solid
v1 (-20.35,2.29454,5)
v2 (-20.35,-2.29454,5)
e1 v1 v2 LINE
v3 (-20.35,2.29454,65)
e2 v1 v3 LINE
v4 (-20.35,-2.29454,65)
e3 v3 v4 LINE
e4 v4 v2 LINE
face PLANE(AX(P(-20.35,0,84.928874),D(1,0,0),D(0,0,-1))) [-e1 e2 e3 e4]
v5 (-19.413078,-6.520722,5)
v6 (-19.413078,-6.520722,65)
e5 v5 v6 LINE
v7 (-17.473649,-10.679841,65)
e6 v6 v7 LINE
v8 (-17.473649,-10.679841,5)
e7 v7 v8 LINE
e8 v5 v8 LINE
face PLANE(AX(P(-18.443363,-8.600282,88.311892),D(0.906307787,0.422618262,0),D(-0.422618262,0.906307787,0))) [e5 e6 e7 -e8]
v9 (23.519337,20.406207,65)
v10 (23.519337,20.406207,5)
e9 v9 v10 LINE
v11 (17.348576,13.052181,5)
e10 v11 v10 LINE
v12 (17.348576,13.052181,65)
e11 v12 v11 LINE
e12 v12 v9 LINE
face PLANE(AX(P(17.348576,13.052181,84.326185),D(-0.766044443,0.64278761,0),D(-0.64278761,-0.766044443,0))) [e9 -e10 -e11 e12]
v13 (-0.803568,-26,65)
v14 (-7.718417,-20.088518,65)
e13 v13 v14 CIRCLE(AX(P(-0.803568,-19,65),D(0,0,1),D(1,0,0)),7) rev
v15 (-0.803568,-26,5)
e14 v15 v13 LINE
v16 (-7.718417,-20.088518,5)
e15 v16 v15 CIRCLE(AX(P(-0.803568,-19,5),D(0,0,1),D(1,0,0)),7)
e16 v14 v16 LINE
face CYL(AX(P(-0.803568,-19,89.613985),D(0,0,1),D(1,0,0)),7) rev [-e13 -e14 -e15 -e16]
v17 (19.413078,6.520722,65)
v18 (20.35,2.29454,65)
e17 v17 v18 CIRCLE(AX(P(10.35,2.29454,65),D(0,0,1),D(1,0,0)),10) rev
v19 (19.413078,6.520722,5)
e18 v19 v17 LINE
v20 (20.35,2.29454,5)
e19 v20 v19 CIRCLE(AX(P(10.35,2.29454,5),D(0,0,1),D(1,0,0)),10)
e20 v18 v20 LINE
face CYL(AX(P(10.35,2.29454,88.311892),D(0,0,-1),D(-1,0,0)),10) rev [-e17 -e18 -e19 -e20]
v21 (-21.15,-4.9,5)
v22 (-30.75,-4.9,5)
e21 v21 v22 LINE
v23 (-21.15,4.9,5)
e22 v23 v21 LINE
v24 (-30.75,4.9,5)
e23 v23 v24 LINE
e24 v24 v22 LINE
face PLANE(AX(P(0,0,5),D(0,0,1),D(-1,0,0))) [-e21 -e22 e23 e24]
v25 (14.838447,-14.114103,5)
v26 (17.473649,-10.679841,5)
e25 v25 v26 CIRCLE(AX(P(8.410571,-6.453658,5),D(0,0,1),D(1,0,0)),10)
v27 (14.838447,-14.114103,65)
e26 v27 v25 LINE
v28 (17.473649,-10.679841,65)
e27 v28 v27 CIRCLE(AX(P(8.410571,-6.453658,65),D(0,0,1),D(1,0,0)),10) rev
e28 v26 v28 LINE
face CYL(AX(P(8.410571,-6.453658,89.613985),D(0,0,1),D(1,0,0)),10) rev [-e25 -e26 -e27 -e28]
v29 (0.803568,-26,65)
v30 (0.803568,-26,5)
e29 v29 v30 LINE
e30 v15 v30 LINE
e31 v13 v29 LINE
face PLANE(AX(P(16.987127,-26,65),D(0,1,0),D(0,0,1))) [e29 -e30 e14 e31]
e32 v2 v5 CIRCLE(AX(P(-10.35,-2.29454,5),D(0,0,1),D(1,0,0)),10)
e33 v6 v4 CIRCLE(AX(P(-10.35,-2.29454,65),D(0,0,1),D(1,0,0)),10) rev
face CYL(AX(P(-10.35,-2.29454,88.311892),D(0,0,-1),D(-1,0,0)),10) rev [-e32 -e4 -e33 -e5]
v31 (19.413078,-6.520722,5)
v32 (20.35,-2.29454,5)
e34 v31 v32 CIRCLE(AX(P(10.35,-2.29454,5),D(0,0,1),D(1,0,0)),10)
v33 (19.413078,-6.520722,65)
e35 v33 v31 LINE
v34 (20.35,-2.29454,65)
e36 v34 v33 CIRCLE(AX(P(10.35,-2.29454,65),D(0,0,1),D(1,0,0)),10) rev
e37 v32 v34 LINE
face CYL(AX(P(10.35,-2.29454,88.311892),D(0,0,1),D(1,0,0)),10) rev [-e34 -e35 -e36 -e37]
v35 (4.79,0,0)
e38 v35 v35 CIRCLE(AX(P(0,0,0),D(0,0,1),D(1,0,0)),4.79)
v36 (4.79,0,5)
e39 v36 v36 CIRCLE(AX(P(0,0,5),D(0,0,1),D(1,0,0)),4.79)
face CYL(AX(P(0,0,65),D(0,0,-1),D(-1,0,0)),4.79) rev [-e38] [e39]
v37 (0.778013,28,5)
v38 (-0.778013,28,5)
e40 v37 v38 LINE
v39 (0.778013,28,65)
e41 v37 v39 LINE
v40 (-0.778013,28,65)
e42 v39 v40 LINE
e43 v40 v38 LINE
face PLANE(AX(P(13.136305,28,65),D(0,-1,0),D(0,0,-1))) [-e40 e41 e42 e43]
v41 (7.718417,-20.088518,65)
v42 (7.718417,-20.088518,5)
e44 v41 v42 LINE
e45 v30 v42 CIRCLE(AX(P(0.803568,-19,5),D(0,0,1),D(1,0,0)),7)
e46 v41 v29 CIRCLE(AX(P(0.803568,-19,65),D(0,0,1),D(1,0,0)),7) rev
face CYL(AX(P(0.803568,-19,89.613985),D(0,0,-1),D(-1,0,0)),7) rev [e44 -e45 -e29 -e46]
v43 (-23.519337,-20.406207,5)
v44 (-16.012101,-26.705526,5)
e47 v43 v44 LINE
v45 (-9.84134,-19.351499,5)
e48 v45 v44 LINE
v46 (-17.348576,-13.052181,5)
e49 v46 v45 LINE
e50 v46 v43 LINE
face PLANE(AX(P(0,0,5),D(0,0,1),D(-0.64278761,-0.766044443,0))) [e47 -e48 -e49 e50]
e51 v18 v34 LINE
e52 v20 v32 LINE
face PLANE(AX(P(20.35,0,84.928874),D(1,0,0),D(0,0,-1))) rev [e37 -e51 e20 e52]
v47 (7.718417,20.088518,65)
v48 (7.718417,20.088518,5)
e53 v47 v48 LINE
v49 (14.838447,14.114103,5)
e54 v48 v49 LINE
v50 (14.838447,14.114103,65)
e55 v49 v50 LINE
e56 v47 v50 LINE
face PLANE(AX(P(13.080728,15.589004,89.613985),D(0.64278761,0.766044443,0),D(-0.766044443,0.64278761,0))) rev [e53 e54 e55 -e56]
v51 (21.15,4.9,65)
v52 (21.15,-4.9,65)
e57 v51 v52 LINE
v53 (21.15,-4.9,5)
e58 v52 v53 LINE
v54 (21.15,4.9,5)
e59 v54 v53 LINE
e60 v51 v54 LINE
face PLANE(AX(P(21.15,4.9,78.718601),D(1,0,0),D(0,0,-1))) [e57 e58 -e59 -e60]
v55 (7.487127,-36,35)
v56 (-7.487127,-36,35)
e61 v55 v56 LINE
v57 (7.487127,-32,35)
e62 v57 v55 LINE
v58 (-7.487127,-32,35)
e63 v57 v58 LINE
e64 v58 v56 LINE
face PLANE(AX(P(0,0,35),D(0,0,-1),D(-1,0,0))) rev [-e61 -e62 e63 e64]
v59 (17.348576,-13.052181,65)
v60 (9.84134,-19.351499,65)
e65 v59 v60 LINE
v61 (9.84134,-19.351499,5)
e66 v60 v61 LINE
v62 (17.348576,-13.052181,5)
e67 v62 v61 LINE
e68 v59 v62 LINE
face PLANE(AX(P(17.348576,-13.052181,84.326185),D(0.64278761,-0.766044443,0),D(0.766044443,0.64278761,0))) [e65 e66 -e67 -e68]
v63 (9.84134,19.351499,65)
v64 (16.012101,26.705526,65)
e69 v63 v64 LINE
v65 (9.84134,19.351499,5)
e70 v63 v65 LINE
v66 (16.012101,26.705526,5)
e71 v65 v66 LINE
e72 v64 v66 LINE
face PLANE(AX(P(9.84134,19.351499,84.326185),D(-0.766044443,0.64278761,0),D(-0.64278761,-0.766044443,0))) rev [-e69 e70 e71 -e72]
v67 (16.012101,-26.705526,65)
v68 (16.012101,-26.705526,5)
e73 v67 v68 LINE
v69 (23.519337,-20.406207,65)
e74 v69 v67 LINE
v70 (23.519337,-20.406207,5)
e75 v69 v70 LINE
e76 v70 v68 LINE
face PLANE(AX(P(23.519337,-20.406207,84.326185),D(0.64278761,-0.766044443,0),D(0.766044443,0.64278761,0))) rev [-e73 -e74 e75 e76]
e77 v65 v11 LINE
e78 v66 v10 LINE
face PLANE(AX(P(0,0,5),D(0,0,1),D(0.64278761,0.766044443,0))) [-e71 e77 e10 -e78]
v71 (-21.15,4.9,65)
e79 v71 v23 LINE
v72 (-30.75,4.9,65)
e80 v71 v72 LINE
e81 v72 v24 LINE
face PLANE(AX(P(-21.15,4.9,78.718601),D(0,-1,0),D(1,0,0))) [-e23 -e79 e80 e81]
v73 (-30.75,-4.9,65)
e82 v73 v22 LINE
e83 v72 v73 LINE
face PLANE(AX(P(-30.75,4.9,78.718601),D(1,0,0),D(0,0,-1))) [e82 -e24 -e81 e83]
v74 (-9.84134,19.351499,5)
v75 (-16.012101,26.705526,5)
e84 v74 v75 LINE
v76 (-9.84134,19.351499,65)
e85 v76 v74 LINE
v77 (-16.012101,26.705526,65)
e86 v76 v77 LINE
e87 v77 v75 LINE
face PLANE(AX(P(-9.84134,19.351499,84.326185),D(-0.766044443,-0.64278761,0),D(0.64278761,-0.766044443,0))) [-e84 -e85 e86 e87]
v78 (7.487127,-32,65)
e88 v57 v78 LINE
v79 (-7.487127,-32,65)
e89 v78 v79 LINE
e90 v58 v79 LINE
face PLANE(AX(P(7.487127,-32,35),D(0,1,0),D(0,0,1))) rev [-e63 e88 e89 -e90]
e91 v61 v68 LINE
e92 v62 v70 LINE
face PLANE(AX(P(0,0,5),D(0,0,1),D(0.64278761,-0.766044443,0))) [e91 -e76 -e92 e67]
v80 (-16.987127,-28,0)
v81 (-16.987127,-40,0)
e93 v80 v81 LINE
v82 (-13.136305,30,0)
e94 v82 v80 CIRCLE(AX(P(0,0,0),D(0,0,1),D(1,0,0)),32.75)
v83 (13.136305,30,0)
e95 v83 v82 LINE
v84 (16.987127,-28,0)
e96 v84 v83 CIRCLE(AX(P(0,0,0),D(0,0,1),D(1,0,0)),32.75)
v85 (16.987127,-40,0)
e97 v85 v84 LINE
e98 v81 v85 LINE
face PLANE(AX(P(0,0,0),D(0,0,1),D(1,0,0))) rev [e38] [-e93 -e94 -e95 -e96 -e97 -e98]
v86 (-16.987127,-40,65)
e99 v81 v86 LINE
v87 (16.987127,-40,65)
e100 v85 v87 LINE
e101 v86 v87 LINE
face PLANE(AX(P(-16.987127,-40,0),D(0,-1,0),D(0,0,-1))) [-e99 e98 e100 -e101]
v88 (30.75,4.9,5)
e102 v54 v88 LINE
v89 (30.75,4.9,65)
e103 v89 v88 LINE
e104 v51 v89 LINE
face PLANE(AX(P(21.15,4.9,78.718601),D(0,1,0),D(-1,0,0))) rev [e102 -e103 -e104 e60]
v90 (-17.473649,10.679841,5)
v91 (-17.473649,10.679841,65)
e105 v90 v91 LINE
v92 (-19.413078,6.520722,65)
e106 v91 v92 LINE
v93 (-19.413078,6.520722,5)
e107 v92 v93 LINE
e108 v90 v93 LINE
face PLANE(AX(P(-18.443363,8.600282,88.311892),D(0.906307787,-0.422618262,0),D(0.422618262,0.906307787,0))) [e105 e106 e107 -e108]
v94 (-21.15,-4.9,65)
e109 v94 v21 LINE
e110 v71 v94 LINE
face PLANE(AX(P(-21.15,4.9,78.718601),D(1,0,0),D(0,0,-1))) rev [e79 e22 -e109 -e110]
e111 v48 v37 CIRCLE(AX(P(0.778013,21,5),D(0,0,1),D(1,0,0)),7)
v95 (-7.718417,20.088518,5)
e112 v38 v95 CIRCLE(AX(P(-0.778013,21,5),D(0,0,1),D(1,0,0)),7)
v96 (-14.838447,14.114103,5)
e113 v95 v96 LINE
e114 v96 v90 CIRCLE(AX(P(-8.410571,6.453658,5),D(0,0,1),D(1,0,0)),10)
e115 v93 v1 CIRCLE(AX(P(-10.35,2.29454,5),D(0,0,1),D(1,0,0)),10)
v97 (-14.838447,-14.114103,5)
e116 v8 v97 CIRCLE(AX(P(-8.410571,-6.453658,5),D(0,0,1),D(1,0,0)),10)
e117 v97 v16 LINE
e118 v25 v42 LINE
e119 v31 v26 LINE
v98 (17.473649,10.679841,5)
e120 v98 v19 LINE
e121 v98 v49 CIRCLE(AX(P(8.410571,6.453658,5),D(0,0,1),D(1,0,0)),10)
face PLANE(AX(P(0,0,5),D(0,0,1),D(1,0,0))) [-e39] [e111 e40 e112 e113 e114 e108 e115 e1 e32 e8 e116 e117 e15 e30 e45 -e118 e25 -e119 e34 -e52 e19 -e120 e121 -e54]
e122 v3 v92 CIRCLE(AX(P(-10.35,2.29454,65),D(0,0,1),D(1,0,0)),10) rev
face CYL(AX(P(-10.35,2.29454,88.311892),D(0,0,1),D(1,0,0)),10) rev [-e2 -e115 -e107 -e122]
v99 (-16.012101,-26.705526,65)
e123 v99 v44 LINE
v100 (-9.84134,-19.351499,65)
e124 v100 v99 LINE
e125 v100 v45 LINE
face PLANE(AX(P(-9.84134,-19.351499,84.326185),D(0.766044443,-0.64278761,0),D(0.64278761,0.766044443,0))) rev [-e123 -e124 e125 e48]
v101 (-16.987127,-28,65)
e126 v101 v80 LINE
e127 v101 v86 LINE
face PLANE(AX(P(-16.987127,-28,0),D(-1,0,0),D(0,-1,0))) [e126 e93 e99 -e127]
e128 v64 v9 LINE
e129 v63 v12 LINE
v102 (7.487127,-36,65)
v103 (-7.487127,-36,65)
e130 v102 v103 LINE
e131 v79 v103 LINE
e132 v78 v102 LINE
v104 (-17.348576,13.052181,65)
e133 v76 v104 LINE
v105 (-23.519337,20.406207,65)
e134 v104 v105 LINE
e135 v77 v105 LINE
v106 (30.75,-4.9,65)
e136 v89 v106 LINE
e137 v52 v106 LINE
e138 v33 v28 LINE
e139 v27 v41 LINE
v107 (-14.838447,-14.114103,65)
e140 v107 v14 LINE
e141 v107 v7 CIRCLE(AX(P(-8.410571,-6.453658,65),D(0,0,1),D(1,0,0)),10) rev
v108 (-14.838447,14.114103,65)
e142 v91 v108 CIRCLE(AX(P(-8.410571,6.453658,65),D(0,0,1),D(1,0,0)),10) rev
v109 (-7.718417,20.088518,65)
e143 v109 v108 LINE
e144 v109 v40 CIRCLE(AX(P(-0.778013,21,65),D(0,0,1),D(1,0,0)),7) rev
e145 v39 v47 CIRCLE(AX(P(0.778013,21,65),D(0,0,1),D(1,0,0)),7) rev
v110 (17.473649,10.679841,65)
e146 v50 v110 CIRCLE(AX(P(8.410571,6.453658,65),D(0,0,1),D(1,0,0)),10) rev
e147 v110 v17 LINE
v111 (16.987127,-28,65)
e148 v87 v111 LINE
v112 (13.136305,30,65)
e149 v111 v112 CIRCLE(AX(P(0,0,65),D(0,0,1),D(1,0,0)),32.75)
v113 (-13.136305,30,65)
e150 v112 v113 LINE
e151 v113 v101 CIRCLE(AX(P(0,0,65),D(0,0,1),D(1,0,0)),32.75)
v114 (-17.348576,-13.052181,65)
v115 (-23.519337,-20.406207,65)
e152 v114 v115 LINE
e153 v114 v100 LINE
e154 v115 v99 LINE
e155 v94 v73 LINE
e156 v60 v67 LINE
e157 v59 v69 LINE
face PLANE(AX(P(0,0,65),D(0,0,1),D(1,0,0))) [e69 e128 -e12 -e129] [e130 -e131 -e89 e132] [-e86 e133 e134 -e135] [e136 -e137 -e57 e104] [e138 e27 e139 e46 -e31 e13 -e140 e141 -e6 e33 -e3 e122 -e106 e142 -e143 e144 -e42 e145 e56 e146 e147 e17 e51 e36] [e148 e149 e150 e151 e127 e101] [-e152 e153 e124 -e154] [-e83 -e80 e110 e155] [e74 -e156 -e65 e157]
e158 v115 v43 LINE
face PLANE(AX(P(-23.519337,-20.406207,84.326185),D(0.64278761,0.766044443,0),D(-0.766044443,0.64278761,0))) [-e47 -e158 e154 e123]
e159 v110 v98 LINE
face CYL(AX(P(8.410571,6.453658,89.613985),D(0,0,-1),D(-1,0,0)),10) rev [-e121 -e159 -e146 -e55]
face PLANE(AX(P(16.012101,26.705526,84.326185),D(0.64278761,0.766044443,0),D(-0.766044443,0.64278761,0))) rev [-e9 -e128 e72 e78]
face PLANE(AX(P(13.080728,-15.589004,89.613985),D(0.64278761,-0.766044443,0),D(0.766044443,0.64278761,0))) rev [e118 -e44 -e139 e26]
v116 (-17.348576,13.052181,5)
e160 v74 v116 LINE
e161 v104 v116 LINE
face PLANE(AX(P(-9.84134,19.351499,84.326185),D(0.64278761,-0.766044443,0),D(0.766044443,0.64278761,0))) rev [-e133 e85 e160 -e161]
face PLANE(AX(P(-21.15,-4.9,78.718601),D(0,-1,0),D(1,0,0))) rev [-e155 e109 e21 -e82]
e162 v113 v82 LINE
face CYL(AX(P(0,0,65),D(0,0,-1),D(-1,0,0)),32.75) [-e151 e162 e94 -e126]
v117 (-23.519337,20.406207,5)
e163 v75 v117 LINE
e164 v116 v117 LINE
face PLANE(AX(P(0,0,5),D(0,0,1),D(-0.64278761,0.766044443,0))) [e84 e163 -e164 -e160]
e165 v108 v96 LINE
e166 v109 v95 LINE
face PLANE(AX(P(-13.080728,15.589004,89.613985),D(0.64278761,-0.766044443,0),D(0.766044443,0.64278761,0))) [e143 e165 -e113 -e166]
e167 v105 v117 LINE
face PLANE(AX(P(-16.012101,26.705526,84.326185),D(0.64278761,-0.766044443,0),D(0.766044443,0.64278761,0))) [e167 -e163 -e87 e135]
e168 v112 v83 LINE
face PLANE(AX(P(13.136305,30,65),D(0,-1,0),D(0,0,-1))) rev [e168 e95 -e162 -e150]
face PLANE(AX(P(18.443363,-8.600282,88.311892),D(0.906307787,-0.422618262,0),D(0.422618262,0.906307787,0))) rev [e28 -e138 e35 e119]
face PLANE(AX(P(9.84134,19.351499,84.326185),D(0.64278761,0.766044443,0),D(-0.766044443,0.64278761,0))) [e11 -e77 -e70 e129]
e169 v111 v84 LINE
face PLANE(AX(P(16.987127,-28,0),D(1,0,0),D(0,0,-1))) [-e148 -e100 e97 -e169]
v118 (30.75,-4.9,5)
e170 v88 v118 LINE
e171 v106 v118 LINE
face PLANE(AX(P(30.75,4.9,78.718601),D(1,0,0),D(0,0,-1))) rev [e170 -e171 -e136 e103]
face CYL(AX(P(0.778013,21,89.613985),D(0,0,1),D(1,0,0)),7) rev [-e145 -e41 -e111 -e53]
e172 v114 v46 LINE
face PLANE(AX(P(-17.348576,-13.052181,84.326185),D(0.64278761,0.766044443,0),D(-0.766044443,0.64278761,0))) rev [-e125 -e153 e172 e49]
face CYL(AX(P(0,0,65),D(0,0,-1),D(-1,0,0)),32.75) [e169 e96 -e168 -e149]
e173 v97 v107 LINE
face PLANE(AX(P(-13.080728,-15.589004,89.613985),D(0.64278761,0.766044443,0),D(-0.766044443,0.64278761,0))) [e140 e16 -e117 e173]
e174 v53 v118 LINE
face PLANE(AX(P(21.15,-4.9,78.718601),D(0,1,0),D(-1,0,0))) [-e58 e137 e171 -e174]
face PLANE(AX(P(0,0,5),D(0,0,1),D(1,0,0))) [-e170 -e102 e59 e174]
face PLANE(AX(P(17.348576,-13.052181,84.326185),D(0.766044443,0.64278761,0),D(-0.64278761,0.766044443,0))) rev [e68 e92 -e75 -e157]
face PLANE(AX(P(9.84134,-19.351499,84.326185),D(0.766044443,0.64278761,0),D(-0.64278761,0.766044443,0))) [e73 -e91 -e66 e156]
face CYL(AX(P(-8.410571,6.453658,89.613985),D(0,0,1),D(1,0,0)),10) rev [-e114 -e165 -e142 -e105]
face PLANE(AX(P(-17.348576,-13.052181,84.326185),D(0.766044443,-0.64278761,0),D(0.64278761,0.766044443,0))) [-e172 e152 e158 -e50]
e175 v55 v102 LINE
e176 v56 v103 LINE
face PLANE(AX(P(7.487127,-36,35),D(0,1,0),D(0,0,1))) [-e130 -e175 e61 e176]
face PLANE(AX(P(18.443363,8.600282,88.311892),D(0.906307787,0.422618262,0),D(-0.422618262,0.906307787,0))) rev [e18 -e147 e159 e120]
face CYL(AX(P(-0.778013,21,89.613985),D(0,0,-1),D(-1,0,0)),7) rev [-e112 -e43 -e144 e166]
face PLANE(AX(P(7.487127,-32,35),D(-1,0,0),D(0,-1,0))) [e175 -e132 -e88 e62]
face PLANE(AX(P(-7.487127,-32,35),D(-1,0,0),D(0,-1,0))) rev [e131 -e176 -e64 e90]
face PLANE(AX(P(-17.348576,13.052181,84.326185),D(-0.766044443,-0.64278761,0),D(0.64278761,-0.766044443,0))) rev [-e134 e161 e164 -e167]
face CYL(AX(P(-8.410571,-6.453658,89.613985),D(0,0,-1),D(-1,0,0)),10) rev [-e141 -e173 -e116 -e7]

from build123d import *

# Parameters (mm, degrees)
SKETCH2_R                       = 4.79
BOSS_EXTRUDE2_DEPTH             = 65
SHELL4_START                    = 5
SHELL4_OUTLINE_R                = 4.79
SHELL4_DEPTH                    = 60
SKETCH3_W                       = 33.974254958
SKETCH3_H                       = 12
BOSS_EXTRUDE3_DEPTH             = 65
SKETCH4_W                       = 14.974254958
SKETCH4_H                       = 4
CUT_EXTRUDE1_DEPTH              = 30
BOSS_EXTRUDE4_DEPTH             = 60
CIRPATTERN2_COUNT               = 3
CIRPATTERN2_ANGLE               = 50
CIRPATTERN2_THE_OTHER_WAY_COUNT = 3
CIRPATTERN2_THE_OTHER_WAY_ANGLE = 50
SKETCH5_4_W                     = 9.6
SKETCH5_4_H                     = 9.8
CUT_EXTRUDE2_DEPTH              = 60
CIRPATTERN3_COUNT               = 2
CIRPATTERN3_ANGLE               = 50
CIRPATTERN3_THE_OTHER_WAY_COUNT = 2
CIRPATTERN3_THE_OTHER_WAY_ANGLE = 50
MIRROR1_START                   = 5
MIRROR1_DEPTH                   = 60
MIRROR1_2_DEPTH                 = 60
FILLET2_R                       = 10
FILLET6_R                       = 7


# Read off the part's stored shape, not the designer's step: Shell4, Mirror1
with BuildPart() as part:
    # Sketch2 → Boss-Extrude2 (new body)
    with BuildSketch(Plane.XY):
        with BuildLine():
            Line((13.136304655, 30), (-13.136304655, 30))
            ThreePointArc((-13.136304655, 30), (-32.678055188, 2.169610358), (-16.987127479, -28))
            Line((-16.987127479, -28), (16.987127479, -28))
            ThreePointArc((16.987127479, -28), (32.678055188, 2.169610358), (13.136304655, 30))
        make_face()
        Circle(SKETCH2_R, mode=Mode.SUBTRACT)
    extrude(amount=BOSS_EXTRUDE2_DEPTH)

    # Shell4 outline → Shell4 (cut)
    with BuildSketch(Plane.XY.offset(SHELL4_START)):
        with BuildLine():
            ThreePointArc((-12.710723819, 28), (-30.677774708, 2.106333062), (-16.418358627, -26))
            Line((-16.418358627, -26), (16.418358627, -26))
            ThreePointArc((16.418358627, -26), (30.677774708, 2.106333062), (12.710723819, 28))
            Line((12.710723819, 28), (-12.710723819, 28))
        make_face()
        Circle(SHELL4_OUTLINE_R, mode=Mode.SUBTRACT)
    extrude(amount=SHELL4_DEPTH, mode=Mode.SUBTRACT)

    # Sketch3 → Boss-Extrude3 (add)
    with BuildSketch(Plane.XY.offset(65)):
        with Locations((0, -34)):
            Rectangle(SKETCH3_W, SKETCH3_H)
    extrude(amount=-BOSS_EXTRUDE3_DEPTH)

    # Sketch4 → Cut-Extrude1 (cut)
    with BuildSketch(Plane.XY.offset(65)):
        with Locations((0, -34)):
            Rectangle(SKETCH4_W, SKETCH4_H)
    extrude(amount=-CUT_EXTRUDE1_DEPTH, mode=Mode.SUBTRACT)

    # Sketch5 → Boss-Extrude4 (add)
    with BuildSketch(Plane.XY.offset(5)):
        with BuildLine():
            Line((21.15, 0), (20.35, 0))
            Line((20.35, 0), (20.35, -7))
            Line((20.35, -7), (29.551861194, -8.5))
            ThreePointArc((29.551861194, -8.5), (30.008505534, -6.712085787), (30.357083193, -4.9))
            Line((30.357083193, -4.9), (21.15, -4.9))
            Line((21.15, -4.9), (21.15, 0))
        make_face()
        with BuildLine():
            Line((20.35, 7), (20.35, 0))
            Line((20.35, 0), (21.15, 0))
            Line((21.15, 0), (21.15, 4.9))
            Line((21.15, 4.9), (30.357083193, 4.9))
            ThreePointArc((30.357083193, 4.9), (30.008505534, 6.712085787), (29.551861194, 8.5))
            Line((29.551861194, 8.5), (20.35, 7))
        make_face()
        with BuildLine():
            Line((30.75, 0), (21.15, 0))
            Line((21.15, 0), (21.15, -4.9))
            Line((21.15, -4.9), (30.357083193, -4.9))
            ThreePointArc((30.357083193, -4.9), (30.651613401, -2.457864094), (30.75, 0))
        make_face()
        with BuildLine():
            Line((21.15, 4.9), (21.15, 0))
            Line((21.15, 0), (30.75, 0))
            ThreePointArc((30.75, 0), (30.651613401, 2.457864094), (30.357083193, 4.9))
            Line((30.357083193, 4.9), (21.15, 4.9))
        make_face()
    boss_extrude4 = extrude(amount=BOSS_EXTRUDE4_DEPTH)

    # CirPattern2: Boss-Extrude4 ×3 about axis
    cirpattern2_axis = Axis((0, 0, 0), (0, 0, -1))
    for i in range(1, CIRPATTERN2_COUNT):
        add(boss_extrude4.rotate(cirpattern2_axis, i * CIRPATTERN2_ANGLE / (CIRPATTERN2_COUNT - 1)))

    # CirPattern2 the other way: Boss-Extrude4 ×3 about axis
    cirpattern2_the_other_way_axis = Axis((0, 0, 0), (0, 0, 1))
    for i in range(1, CIRPATTERN2_THE_OTHER_WAY_COUNT):
        add(boss_extrude4.rotate(cirpattern2_the_other_way_axis, i * CIRPATTERN2_THE_OTHER_WAY_ANGLE / (CIRPATTERN2_THE_OTHER_WAY_COUNT - 1)))

    # Sketch5<4> → Cut-Extrude2 (cut)
    with BuildSketch(Plane.XY.offset(5)):
        with Locations((25.95, 0)):
            Rectangle(SKETCH5_4_W, SKETCH5_4_H)
    cut_extrude2 = extrude(amount=CUT_EXTRUDE2_DEPTH, mode=Mode.SUBTRACT)

    # CirPattern3: Cut-Extrude2 ×2 about axis
    cirpattern3_axis = Axis((0, 0, 0), (0, 0, 1))
    for i in range(1, CIRPATTERN3_COUNT):
        add(cut_extrude2.rotate(cirpattern3_axis, i * CIRPATTERN3_ANGLE / (CIRPATTERN3_COUNT - 1)), mode=Mode.SUBTRACT)

    # CirPattern3 the other way: Cut-Extrude2 ×2 about axis
    cirpattern3_the_other_way_axis = Axis((0, 0, 0), (0, 0, -1))
    for i in range(1, CIRPATTERN3_THE_OTHER_WAY_COUNT):
        add(cut_extrude2.rotate(cirpattern3_the_other_way_axis, i * CIRPATTERN3_THE_OTHER_WAY_ANGLE / (CIRPATTERN3_THE_OTHER_WAY_COUNT - 1)), mode=Mode.SUBTRACT)

    # Mirror1 outline → Mirror1 (cut)
    with BuildSketch(Plane.XY.offset(MIRROR1_START)):
        with BuildLine():
            Line((-30.357083193, 4.9), (-30.75, 4.9))
            Line((-30.75, 4.9), (-30.75, 0))
            ThreePointArc((-30.75, 0), (-30.651613401, 2.457864094), (-30.357083193, 4.9))
        make_face()
        with BuildLine():
            ThreePointArc((-30.357083193, -4.9), (-30.651613401, -2.457864094), (-30.75, 0))
            Line((-30.75, 0), (-30.75, -4.9))
            Line((-30.75, -4.9), (-30.357083193, -4.9))
        make_face()
        with BuildLine():
            Line((-23.519336769, 20.406207338), (-23.266774714, 20.105215602))
            ThreePointArc((-23.266774714, 20.105215602), (-21.585264808, 21.90065851), (-19.765620831, 23.555948998))
            Line((-19.765620831, 23.555948998), (-23.519336769, 20.406207338))
        make_face()
        with BuildLine():
            Line((-16.012101227, 26.705525913), (-19.765620831, 23.555948998))
            ThreePointArc((-19.765620831, 23.555948998), (-17.819591962, 25.060419835), (-15.759539172, 26.404534177))
            Line((-15.759539172, 26.404534177), (-16.012101227, 26.705525913))
        make_face()
        with BuildLine():
            ThreePointArc((-19.765615493, -23.555953477), (-21.585262326, -21.900660956), (-23.266774714, -20.105215602))
            Line((-23.266774714, -20.105215602), (-23.519336769, -20.406207338))
            Line((-23.519336769, -20.406207338), (-19.765615493, -23.555953477))
        make_face()
        with BuildLine():
            ThreePointArc((-16.418358627, -26), (-18.133210875, -24.834435032), (-19.765615493, -23.555953477))
            Line((-19.765615493, -23.555953477), (-16.012101227, -26.705525913))
            Line((-16.012101227, -26.705525913), (-15.420094694, -26))
            Line((-15.420094694, -26), (-16.418358627, -26))
        make_face()
    extrude(amount=MIRROR1_DEPTH, mode=Mode.SUBTRACT)

    # Mirror1 2 outline → Mirror1 2 (add)
    with BuildSketch(Plane.XY.offset(MIRROR1_START)):
        with BuildLine():
            ThreePointArc((-23.266774714, 20.105215602), (-27.868964451, 12.995511548), (-30.357083193, 4.9))
            Line((-30.357083193, 4.9), (-21.15, 4.9))
            Line((-21.15, 4.9), (-21.15, -4.9))
            Line((-21.15, -4.9), (-30.357083193, -4.9))
            ThreePointArc((-30.357083193, -4.9), (-27.868964451, -12.995511548), (-23.266774714, -20.105215602))
            Line((-23.266774714, -20.105215602), (-17.348575716, -13.052180685))
            Line((-17.348575716, -13.052180685), (-9.841340174, -19.351499259))
            Line((-9.841340174, -19.351499259), (-15.420094694, -26))
            Line((-15.420094694, -26), (-11.234208489, -26))
            Line((-11.234208489, -26), (-7.718416755, -20.088517685))
            Line((-7.718416755, -20.088517685), (-16.536726932, -12.689076868))
            Line((-16.536726932, -12.689076868), (-20.35, -4.511486385))
            Line((-20.35, -4.511486385), (-20.35, 4.511486385))
            Line((-20.35, 4.511486385), (-16.536726932, 12.689076868))
            Line((-16.536726932, 12.689076868), (-7.718416755, 20.088517685))
            Line((-7.718416755, 20.088517685), (-12.423687387, 28))
            Line((-12.423687387, 28), (-12.710723819, 28))
            ThreePointArc((-12.710723819, 28), (-14.257466342, 27.244947302), (-15.759539172, 26.404534177))
            Line((-15.759539172, 26.404534177), (-9.841340174, 19.351499259))
            Line((-9.841340174, 19.351499259), (-17.348575716, 13.052180685))
            Line((-17.348575716, 13.052180685), (-23.266774714, 20.105215602))
        make_face()
    extrude(amount=MIRROR1_2_DEPTH)

    # Fillet2
    fillet2_edges = [part.edges().sort_by_distance(p)[0] for p in [
        (20.35, 4.511486385, 35),
        (16.536726932, 12.689076868, 35),
        (-20.35, -4.511486385, 35),
        (-16.536726932, -12.689076868, 35),
        (-20.35, 4.511486385, 35),
        (-16.536726932, 12.689076868, 35),
        (20.35, -4.511486385, 35),
        (16.536726932, -12.689076868, 35),
    ]]
    fillet(fillet2_edges, radius=FILLET2_R)

    # Fillet6
    # the kernel refuses this fillet: 7 mm, written as the material it adds along each edge
    with BuildSketch(Plane(origin=(12.423687387, 28, 5), x_dir=(-0.5111673704735938, -0.8594811919775275, 0), z_dir=(0, 0, 1))) as fillet6_piece_1:
        with BuildLine():
            CenterArc((11.96925694, -6.431066244), FILLET6_R, 113.259789789, 97.48182924)
            Line((5.952888596, -10.009237838), (5.832561229, -10.08080127))
            Line((5.832561229, -10.08080127), (-0.120327367, -0.071563432))
            Line((-0.120327367, -0.071563432), (0, 0.14))
            ThreePointArc((0, 0.14), (4.602475533, 0.14), (9.149664949, 0.128621325))
            Line((9.149664949, 0.128621325), (9.204951066, 0))
        make_face()
    extrude(amount=60)
    with BuildSketch(Plane(origin=(-11.234208489, -26, 5), x_dir=(1, 0, 0), z_dir=(0, 0, 1))) as fillet6_piece_2:
        with BuildLine():
            CenterArc((10.430640196, 7), FILLET6_R, 188.945942292, 81.054057708)
            Line((3.515791734, 5.911482315), (3.377494765, 5.889711961))
            ThreePointArc((3.377494765, 5.889711961), (1.6375685, 3.027304589), (-0.120327367, 0.071563432))
            Line((-0.120327367, 0.071563432), (0, -0.14))
            Line((0, -0.14), (10.430640196, -0.14))
            Line((10.430640196, -0.14), (10.430640196, 0))
        make_face()
    extrude(amount=60)
    with BuildSketch(Plane(origin=(-12.423687387, 28, 5), x_dir=(1, 0, 0), z_dir=(0, 0, 1))) as fillet6_piece_3:
        with BuildLine():
            CenterArc((11.645674078, -7), FILLET6_R, 90, 97.481829242)
            Line((4.705270632, -7.911482315), (4.566462563, -7.929711961))
            ThreePointArc((4.566462563, -7.929711961), (2.232307949, -4.027304589), (-0.120327367, -0.071563432))
            Line((-0.120327367, -0.071563432), (0, 0.14))
            Line((0, 0.14), (11.645674078, 0.14))
            Line((11.645674078, 0.14), (11.645674078, 0))
        make_face()
    extrude(amount=60)
    with BuildSketch(Plane(origin=(11.234208489, -26, 65), x_dir=(-0.5111673704735934, 0.8594811919775279, 0), z_dir=(0, 0, -1))) as fillet6_piece_4:
        with BuildLine():
            CenterArc((11.348171265, -5.386767475), FILLET6_R, 129.687561323, 81.054057706)
            Line((5.331802921, -8.964939069), (5.211475554, -9.036502501))
            Line((5.211475554, -9.036502501), (-0.120327367, -0.071563432))
            Line((-0.120327367, -0.071563432), (0, 0.14))
            ThreePointArc((0, 0.14), (3.438982941, 0.14), (6.788561774, 0.10773535))
            Line((6.788561774, 0.10773535), (6.877965882, 0))
        make_face()
    extrude(amount=60)


solid = part.part
